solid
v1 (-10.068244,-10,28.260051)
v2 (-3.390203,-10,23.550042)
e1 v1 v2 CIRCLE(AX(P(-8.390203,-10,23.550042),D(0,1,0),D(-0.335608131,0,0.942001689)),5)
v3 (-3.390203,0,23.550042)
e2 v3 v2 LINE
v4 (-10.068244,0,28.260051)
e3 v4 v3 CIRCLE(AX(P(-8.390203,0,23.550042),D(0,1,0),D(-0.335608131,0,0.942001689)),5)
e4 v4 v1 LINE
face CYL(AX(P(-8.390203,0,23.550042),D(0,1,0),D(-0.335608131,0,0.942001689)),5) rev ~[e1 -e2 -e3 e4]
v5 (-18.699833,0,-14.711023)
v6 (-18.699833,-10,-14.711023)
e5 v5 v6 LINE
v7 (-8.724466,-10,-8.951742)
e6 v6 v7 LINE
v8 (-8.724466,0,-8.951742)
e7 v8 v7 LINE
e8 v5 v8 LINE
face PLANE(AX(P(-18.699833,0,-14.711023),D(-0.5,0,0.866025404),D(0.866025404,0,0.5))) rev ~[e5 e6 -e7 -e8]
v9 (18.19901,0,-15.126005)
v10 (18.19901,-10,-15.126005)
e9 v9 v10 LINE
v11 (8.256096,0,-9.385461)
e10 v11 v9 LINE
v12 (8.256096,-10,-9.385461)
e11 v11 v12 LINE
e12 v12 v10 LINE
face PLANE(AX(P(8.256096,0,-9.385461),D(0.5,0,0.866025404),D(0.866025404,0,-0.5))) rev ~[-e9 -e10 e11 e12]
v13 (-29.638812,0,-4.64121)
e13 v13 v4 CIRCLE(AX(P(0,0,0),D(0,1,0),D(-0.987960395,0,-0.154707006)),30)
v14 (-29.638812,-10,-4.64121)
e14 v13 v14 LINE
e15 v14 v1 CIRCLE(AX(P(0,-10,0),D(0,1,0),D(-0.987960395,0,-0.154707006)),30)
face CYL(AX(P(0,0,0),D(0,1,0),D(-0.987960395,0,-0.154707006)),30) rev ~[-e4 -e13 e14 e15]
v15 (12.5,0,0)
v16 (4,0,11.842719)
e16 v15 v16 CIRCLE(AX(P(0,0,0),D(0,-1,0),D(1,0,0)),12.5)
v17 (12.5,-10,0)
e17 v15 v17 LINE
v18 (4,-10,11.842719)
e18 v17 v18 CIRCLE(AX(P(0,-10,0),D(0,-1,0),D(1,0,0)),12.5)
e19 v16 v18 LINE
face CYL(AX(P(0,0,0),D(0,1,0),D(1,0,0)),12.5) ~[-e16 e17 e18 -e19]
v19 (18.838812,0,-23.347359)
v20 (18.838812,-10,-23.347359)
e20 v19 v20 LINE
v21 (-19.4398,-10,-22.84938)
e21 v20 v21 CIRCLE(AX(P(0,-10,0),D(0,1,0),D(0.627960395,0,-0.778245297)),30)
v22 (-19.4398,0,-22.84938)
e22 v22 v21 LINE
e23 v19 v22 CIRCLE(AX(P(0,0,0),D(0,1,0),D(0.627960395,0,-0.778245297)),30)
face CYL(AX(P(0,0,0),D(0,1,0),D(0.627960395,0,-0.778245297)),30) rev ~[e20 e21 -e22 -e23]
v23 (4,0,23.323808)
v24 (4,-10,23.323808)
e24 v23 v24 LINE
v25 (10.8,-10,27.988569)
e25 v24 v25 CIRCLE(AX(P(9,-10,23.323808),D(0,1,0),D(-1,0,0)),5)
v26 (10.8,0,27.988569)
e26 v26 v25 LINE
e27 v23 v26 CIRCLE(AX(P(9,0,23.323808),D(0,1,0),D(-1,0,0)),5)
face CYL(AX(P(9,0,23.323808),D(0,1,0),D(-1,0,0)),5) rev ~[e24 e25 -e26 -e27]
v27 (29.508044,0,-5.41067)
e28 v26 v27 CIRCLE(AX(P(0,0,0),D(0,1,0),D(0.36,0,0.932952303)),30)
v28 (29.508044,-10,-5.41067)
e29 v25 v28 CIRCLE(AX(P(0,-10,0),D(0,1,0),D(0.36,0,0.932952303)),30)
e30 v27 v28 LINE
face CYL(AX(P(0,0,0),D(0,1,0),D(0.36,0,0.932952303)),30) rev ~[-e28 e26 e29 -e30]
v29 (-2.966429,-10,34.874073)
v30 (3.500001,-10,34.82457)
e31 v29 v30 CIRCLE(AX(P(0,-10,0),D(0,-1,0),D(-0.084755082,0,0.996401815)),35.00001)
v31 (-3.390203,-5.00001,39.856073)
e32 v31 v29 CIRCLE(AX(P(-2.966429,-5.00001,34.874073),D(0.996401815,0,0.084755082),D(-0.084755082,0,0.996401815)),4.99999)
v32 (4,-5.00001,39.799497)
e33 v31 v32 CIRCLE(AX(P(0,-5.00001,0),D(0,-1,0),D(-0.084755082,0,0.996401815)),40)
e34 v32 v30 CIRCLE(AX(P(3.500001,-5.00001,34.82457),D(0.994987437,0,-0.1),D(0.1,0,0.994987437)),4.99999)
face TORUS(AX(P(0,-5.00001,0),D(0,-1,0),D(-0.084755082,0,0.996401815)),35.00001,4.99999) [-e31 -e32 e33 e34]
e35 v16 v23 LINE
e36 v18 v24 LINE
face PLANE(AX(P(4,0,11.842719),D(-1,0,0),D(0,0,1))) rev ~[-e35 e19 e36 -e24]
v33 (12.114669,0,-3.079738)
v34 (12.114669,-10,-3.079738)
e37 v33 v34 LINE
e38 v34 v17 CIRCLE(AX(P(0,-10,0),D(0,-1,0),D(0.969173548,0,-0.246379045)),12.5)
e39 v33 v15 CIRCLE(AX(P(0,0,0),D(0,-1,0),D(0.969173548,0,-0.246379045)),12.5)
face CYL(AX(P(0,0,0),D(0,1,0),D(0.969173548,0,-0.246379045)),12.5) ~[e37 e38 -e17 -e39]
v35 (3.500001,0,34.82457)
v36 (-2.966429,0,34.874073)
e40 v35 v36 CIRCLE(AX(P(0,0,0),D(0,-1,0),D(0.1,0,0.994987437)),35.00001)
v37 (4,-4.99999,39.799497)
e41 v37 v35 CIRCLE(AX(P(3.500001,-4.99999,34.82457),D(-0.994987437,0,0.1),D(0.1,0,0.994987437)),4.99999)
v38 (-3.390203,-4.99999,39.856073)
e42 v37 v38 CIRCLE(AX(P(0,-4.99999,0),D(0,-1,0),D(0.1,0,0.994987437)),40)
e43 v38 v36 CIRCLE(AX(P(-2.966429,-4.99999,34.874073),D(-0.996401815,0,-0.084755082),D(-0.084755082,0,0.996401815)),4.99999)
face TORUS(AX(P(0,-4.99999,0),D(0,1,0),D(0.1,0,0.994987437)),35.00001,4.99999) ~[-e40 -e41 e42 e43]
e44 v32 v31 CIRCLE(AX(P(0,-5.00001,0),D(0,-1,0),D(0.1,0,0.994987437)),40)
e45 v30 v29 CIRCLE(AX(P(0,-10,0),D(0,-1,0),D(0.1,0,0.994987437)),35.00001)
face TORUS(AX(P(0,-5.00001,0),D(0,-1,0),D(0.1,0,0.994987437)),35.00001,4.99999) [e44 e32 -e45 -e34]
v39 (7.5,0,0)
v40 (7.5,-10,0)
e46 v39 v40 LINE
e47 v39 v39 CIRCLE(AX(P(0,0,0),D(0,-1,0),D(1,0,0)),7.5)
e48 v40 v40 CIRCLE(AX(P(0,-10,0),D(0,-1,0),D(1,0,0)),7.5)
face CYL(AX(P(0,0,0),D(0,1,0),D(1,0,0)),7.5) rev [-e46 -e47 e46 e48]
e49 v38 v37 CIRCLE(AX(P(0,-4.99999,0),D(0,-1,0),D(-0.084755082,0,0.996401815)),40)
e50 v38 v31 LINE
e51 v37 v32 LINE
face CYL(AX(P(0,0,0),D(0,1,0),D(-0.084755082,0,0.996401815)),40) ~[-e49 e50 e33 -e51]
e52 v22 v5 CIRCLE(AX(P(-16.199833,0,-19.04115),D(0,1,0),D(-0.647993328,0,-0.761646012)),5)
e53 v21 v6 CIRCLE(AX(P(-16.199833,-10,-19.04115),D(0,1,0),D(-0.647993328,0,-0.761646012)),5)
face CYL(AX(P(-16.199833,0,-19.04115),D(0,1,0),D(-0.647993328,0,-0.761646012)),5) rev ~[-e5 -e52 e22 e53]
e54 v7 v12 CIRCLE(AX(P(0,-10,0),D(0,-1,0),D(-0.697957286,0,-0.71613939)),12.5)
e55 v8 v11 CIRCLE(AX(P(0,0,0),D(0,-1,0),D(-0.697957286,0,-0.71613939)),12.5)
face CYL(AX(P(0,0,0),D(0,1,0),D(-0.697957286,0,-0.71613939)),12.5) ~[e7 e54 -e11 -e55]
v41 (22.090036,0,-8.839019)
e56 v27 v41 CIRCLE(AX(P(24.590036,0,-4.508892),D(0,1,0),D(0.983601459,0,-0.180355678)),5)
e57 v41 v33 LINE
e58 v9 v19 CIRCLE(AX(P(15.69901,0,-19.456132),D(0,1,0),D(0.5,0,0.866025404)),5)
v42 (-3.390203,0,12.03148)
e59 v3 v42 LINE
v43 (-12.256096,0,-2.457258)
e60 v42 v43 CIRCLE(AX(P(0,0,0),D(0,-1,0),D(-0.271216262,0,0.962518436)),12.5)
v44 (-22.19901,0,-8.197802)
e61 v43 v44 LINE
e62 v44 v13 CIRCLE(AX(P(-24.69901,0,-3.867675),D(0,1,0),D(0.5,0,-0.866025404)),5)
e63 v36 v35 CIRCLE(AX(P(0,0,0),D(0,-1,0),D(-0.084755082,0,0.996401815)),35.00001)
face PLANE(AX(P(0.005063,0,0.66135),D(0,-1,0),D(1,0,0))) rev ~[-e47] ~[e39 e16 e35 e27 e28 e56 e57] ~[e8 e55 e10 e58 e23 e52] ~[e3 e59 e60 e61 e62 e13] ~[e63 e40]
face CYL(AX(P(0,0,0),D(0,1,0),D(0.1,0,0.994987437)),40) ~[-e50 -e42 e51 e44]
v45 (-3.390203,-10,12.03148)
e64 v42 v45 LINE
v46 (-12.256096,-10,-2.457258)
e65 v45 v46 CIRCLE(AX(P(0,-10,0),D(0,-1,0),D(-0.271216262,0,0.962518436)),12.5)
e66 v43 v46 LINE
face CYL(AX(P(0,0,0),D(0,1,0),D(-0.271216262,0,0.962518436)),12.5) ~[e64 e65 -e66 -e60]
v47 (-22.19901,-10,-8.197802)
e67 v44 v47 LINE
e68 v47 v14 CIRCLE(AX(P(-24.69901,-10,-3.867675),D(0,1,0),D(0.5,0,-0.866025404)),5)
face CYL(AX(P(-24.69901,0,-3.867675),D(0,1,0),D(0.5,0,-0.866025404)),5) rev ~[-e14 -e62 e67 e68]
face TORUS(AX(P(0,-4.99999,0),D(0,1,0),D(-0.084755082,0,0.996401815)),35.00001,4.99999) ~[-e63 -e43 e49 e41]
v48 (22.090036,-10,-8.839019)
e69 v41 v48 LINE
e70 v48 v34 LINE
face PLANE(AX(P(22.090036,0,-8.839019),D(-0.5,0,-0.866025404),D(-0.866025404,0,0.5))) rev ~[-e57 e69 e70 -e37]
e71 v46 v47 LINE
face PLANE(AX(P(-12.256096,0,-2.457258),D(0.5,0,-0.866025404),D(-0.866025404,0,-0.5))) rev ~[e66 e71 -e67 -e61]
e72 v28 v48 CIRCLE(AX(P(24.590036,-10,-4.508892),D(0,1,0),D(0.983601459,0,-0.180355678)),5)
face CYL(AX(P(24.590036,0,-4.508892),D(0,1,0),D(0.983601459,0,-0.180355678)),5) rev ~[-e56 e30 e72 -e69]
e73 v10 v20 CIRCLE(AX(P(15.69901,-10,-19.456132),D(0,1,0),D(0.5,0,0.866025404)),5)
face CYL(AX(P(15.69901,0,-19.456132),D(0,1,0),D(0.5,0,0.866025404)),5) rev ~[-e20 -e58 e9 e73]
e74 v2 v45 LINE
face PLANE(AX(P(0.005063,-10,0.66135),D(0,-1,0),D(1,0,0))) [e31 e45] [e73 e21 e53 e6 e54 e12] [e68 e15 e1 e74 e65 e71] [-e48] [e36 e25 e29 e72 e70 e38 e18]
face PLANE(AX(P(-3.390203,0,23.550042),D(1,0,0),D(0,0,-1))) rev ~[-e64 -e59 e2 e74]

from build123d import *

# Parameters (mm, degrees)
F0_R     = 7.5
F1_DEPTH = 10
F2_R     = 4.99999


# Not quite as in the source:
# - a fillet or chamfer is up to 0.001 mm smaller than in the source, because OpenCascade refuses the exact size


with BuildPart() as f1:
    # F0 (on Front) → F1 (new body)
    with BuildSketch(Plane.XZ):
        with BuildLine():
            ThreePointArc((-3.3902032697, 39.8560725836), (-27.0591192504, -29.4585143107), (40, 0))
            ThreePointArc((40, 0), (29.6647939484, 26.83281573), (4, 39.7994974843))
            ThreePointArc((4, 39.7994974843), (0.3062077702, 39.9988279428), (-3.3902032697, 39.8560725836))
        make_face()
        with BuildLine():
            ThreePointArc((-29.6388118521, -4.6412101868), (-25.7834406394, 15.3366941937), (-10.0682439236, 28.2600506775))
            ThreePointArc((-10.0682439236, 28.2600506775), (-5.5083812132, 27.6360062099), (-3.3902032697, 23.5500422312))
            Line((-3.3902032697, 23.5500422312), (-3.3902032697, 12.0314804488))
            ThreePointArc((-3.3902032697, 12.0314804488), (0.3191719091, 12.4959245073), (4, 11.8427192823))
            Line((4, 11.8427192823), (4, 23.3238075794))
            ThreePointArc((4, 23.3238075794), (6.1715728753, 27.446913205), (10.8, 27.9885690953))
            ThreePointArc((10.8, 27.9885690953), (26.1736871016, 14.6607674939), (29.5080437608, -5.4106703294))
            ThreePointArc((29.5080437608, -5.4106703294), (26.6876740435, -9.0476050406), (22.0900364673, -8.8390189601))
            Line((22.0900364673, -8.8390189601), (12.1146693487, -3.0797380689))
            ThreePointArc((12.1146693487, -3.0797380689), (10.6622021125, -6.5243732351), (8.2560957484, -9.3854612563))
            Line((8.2560957484, -9.3854612563), (18.1990098767, -15.1260054048))
            ThreePointArc((18.1990098767, -15.1260054048), (20.6839376534, -19.0681954938), (18.8388118521, -23.3473589085))
            ThreePointArc((18.8388118521, -23.3473589085), (-0.3902464621, -29.9974616876), (-19.4397998371, -22.8493803481))
            ThreePointArc((-19.4397998371, -22.8493803481), (-21.1792928303, -18.5884011693), (-18.6998331976, -14.7110232712))
            Line((-18.6998331976, -14.7110232712), (-8.724466079, -8.95174238))
            ThreePointArc((-8.724466079, -8.95174238), (-10.9813740217, -5.9715512722), (-12.2560957484, -2.457258026))
            Line((-12.2560957484, -2.457258026), (-22.1990098767, -8.1978021746))
            ThreePointArc((-22.1990098767, -8.1978021746), (-26.8555105286, -8.3787177112), (-29.6388118521, -4.6412101868))
        make_face(mode=Mode.SUBTRACT)
        with BuildLine():
            ThreePointArc((4, 11.8427192823), (0.3191719091, 12.4959245073), (-3.3902032697, 12.0314804488))
            ThreePointArc((-3.3902032697, 12.0314804488), (-10.6622021125, 6.5243732351), (-12.2560957484, -2.457258026))
            ThreePointArc((-12.2560957484, -2.457258026), (-10.9813740217, -5.9715512722), (-8.724466079, -8.95174238))
            ThreePointArc((-8.724466079, -8.95174238), (-0.3191719091, -12.4959245073), (8.2560957484, -9.3854612563))
            ThreePointArc((8.2560957484, -9.3854612563), (10.6622021125, -6.5243732351), (12.1146693487, -3.0797380689))
            ThreePointArc((12.1146693487, -3.0797380689), (12.4032932493, -1.5518751789), (12.5, 0))
            ThreePointArc((12.5, 0), (10.1550480058, 7.2886898686), (4, 11.8427192823))
        make_face()
        Circle(F0_R, mode=Mode.SUBTRACT)
    extrude(amount=F1_DEPTH)

    # F2 (radius 5 in the source; OpenCascade refuses exactly that, so slightly less here)
    f2_edges = [f1.edges().sort_by_distance(p)[0] for p in [
        (-40, -10, 0),
        (-40, 0, 0),
    ]]
    fillet(f2_edges, radius=F2_R)


solid = f1.part
